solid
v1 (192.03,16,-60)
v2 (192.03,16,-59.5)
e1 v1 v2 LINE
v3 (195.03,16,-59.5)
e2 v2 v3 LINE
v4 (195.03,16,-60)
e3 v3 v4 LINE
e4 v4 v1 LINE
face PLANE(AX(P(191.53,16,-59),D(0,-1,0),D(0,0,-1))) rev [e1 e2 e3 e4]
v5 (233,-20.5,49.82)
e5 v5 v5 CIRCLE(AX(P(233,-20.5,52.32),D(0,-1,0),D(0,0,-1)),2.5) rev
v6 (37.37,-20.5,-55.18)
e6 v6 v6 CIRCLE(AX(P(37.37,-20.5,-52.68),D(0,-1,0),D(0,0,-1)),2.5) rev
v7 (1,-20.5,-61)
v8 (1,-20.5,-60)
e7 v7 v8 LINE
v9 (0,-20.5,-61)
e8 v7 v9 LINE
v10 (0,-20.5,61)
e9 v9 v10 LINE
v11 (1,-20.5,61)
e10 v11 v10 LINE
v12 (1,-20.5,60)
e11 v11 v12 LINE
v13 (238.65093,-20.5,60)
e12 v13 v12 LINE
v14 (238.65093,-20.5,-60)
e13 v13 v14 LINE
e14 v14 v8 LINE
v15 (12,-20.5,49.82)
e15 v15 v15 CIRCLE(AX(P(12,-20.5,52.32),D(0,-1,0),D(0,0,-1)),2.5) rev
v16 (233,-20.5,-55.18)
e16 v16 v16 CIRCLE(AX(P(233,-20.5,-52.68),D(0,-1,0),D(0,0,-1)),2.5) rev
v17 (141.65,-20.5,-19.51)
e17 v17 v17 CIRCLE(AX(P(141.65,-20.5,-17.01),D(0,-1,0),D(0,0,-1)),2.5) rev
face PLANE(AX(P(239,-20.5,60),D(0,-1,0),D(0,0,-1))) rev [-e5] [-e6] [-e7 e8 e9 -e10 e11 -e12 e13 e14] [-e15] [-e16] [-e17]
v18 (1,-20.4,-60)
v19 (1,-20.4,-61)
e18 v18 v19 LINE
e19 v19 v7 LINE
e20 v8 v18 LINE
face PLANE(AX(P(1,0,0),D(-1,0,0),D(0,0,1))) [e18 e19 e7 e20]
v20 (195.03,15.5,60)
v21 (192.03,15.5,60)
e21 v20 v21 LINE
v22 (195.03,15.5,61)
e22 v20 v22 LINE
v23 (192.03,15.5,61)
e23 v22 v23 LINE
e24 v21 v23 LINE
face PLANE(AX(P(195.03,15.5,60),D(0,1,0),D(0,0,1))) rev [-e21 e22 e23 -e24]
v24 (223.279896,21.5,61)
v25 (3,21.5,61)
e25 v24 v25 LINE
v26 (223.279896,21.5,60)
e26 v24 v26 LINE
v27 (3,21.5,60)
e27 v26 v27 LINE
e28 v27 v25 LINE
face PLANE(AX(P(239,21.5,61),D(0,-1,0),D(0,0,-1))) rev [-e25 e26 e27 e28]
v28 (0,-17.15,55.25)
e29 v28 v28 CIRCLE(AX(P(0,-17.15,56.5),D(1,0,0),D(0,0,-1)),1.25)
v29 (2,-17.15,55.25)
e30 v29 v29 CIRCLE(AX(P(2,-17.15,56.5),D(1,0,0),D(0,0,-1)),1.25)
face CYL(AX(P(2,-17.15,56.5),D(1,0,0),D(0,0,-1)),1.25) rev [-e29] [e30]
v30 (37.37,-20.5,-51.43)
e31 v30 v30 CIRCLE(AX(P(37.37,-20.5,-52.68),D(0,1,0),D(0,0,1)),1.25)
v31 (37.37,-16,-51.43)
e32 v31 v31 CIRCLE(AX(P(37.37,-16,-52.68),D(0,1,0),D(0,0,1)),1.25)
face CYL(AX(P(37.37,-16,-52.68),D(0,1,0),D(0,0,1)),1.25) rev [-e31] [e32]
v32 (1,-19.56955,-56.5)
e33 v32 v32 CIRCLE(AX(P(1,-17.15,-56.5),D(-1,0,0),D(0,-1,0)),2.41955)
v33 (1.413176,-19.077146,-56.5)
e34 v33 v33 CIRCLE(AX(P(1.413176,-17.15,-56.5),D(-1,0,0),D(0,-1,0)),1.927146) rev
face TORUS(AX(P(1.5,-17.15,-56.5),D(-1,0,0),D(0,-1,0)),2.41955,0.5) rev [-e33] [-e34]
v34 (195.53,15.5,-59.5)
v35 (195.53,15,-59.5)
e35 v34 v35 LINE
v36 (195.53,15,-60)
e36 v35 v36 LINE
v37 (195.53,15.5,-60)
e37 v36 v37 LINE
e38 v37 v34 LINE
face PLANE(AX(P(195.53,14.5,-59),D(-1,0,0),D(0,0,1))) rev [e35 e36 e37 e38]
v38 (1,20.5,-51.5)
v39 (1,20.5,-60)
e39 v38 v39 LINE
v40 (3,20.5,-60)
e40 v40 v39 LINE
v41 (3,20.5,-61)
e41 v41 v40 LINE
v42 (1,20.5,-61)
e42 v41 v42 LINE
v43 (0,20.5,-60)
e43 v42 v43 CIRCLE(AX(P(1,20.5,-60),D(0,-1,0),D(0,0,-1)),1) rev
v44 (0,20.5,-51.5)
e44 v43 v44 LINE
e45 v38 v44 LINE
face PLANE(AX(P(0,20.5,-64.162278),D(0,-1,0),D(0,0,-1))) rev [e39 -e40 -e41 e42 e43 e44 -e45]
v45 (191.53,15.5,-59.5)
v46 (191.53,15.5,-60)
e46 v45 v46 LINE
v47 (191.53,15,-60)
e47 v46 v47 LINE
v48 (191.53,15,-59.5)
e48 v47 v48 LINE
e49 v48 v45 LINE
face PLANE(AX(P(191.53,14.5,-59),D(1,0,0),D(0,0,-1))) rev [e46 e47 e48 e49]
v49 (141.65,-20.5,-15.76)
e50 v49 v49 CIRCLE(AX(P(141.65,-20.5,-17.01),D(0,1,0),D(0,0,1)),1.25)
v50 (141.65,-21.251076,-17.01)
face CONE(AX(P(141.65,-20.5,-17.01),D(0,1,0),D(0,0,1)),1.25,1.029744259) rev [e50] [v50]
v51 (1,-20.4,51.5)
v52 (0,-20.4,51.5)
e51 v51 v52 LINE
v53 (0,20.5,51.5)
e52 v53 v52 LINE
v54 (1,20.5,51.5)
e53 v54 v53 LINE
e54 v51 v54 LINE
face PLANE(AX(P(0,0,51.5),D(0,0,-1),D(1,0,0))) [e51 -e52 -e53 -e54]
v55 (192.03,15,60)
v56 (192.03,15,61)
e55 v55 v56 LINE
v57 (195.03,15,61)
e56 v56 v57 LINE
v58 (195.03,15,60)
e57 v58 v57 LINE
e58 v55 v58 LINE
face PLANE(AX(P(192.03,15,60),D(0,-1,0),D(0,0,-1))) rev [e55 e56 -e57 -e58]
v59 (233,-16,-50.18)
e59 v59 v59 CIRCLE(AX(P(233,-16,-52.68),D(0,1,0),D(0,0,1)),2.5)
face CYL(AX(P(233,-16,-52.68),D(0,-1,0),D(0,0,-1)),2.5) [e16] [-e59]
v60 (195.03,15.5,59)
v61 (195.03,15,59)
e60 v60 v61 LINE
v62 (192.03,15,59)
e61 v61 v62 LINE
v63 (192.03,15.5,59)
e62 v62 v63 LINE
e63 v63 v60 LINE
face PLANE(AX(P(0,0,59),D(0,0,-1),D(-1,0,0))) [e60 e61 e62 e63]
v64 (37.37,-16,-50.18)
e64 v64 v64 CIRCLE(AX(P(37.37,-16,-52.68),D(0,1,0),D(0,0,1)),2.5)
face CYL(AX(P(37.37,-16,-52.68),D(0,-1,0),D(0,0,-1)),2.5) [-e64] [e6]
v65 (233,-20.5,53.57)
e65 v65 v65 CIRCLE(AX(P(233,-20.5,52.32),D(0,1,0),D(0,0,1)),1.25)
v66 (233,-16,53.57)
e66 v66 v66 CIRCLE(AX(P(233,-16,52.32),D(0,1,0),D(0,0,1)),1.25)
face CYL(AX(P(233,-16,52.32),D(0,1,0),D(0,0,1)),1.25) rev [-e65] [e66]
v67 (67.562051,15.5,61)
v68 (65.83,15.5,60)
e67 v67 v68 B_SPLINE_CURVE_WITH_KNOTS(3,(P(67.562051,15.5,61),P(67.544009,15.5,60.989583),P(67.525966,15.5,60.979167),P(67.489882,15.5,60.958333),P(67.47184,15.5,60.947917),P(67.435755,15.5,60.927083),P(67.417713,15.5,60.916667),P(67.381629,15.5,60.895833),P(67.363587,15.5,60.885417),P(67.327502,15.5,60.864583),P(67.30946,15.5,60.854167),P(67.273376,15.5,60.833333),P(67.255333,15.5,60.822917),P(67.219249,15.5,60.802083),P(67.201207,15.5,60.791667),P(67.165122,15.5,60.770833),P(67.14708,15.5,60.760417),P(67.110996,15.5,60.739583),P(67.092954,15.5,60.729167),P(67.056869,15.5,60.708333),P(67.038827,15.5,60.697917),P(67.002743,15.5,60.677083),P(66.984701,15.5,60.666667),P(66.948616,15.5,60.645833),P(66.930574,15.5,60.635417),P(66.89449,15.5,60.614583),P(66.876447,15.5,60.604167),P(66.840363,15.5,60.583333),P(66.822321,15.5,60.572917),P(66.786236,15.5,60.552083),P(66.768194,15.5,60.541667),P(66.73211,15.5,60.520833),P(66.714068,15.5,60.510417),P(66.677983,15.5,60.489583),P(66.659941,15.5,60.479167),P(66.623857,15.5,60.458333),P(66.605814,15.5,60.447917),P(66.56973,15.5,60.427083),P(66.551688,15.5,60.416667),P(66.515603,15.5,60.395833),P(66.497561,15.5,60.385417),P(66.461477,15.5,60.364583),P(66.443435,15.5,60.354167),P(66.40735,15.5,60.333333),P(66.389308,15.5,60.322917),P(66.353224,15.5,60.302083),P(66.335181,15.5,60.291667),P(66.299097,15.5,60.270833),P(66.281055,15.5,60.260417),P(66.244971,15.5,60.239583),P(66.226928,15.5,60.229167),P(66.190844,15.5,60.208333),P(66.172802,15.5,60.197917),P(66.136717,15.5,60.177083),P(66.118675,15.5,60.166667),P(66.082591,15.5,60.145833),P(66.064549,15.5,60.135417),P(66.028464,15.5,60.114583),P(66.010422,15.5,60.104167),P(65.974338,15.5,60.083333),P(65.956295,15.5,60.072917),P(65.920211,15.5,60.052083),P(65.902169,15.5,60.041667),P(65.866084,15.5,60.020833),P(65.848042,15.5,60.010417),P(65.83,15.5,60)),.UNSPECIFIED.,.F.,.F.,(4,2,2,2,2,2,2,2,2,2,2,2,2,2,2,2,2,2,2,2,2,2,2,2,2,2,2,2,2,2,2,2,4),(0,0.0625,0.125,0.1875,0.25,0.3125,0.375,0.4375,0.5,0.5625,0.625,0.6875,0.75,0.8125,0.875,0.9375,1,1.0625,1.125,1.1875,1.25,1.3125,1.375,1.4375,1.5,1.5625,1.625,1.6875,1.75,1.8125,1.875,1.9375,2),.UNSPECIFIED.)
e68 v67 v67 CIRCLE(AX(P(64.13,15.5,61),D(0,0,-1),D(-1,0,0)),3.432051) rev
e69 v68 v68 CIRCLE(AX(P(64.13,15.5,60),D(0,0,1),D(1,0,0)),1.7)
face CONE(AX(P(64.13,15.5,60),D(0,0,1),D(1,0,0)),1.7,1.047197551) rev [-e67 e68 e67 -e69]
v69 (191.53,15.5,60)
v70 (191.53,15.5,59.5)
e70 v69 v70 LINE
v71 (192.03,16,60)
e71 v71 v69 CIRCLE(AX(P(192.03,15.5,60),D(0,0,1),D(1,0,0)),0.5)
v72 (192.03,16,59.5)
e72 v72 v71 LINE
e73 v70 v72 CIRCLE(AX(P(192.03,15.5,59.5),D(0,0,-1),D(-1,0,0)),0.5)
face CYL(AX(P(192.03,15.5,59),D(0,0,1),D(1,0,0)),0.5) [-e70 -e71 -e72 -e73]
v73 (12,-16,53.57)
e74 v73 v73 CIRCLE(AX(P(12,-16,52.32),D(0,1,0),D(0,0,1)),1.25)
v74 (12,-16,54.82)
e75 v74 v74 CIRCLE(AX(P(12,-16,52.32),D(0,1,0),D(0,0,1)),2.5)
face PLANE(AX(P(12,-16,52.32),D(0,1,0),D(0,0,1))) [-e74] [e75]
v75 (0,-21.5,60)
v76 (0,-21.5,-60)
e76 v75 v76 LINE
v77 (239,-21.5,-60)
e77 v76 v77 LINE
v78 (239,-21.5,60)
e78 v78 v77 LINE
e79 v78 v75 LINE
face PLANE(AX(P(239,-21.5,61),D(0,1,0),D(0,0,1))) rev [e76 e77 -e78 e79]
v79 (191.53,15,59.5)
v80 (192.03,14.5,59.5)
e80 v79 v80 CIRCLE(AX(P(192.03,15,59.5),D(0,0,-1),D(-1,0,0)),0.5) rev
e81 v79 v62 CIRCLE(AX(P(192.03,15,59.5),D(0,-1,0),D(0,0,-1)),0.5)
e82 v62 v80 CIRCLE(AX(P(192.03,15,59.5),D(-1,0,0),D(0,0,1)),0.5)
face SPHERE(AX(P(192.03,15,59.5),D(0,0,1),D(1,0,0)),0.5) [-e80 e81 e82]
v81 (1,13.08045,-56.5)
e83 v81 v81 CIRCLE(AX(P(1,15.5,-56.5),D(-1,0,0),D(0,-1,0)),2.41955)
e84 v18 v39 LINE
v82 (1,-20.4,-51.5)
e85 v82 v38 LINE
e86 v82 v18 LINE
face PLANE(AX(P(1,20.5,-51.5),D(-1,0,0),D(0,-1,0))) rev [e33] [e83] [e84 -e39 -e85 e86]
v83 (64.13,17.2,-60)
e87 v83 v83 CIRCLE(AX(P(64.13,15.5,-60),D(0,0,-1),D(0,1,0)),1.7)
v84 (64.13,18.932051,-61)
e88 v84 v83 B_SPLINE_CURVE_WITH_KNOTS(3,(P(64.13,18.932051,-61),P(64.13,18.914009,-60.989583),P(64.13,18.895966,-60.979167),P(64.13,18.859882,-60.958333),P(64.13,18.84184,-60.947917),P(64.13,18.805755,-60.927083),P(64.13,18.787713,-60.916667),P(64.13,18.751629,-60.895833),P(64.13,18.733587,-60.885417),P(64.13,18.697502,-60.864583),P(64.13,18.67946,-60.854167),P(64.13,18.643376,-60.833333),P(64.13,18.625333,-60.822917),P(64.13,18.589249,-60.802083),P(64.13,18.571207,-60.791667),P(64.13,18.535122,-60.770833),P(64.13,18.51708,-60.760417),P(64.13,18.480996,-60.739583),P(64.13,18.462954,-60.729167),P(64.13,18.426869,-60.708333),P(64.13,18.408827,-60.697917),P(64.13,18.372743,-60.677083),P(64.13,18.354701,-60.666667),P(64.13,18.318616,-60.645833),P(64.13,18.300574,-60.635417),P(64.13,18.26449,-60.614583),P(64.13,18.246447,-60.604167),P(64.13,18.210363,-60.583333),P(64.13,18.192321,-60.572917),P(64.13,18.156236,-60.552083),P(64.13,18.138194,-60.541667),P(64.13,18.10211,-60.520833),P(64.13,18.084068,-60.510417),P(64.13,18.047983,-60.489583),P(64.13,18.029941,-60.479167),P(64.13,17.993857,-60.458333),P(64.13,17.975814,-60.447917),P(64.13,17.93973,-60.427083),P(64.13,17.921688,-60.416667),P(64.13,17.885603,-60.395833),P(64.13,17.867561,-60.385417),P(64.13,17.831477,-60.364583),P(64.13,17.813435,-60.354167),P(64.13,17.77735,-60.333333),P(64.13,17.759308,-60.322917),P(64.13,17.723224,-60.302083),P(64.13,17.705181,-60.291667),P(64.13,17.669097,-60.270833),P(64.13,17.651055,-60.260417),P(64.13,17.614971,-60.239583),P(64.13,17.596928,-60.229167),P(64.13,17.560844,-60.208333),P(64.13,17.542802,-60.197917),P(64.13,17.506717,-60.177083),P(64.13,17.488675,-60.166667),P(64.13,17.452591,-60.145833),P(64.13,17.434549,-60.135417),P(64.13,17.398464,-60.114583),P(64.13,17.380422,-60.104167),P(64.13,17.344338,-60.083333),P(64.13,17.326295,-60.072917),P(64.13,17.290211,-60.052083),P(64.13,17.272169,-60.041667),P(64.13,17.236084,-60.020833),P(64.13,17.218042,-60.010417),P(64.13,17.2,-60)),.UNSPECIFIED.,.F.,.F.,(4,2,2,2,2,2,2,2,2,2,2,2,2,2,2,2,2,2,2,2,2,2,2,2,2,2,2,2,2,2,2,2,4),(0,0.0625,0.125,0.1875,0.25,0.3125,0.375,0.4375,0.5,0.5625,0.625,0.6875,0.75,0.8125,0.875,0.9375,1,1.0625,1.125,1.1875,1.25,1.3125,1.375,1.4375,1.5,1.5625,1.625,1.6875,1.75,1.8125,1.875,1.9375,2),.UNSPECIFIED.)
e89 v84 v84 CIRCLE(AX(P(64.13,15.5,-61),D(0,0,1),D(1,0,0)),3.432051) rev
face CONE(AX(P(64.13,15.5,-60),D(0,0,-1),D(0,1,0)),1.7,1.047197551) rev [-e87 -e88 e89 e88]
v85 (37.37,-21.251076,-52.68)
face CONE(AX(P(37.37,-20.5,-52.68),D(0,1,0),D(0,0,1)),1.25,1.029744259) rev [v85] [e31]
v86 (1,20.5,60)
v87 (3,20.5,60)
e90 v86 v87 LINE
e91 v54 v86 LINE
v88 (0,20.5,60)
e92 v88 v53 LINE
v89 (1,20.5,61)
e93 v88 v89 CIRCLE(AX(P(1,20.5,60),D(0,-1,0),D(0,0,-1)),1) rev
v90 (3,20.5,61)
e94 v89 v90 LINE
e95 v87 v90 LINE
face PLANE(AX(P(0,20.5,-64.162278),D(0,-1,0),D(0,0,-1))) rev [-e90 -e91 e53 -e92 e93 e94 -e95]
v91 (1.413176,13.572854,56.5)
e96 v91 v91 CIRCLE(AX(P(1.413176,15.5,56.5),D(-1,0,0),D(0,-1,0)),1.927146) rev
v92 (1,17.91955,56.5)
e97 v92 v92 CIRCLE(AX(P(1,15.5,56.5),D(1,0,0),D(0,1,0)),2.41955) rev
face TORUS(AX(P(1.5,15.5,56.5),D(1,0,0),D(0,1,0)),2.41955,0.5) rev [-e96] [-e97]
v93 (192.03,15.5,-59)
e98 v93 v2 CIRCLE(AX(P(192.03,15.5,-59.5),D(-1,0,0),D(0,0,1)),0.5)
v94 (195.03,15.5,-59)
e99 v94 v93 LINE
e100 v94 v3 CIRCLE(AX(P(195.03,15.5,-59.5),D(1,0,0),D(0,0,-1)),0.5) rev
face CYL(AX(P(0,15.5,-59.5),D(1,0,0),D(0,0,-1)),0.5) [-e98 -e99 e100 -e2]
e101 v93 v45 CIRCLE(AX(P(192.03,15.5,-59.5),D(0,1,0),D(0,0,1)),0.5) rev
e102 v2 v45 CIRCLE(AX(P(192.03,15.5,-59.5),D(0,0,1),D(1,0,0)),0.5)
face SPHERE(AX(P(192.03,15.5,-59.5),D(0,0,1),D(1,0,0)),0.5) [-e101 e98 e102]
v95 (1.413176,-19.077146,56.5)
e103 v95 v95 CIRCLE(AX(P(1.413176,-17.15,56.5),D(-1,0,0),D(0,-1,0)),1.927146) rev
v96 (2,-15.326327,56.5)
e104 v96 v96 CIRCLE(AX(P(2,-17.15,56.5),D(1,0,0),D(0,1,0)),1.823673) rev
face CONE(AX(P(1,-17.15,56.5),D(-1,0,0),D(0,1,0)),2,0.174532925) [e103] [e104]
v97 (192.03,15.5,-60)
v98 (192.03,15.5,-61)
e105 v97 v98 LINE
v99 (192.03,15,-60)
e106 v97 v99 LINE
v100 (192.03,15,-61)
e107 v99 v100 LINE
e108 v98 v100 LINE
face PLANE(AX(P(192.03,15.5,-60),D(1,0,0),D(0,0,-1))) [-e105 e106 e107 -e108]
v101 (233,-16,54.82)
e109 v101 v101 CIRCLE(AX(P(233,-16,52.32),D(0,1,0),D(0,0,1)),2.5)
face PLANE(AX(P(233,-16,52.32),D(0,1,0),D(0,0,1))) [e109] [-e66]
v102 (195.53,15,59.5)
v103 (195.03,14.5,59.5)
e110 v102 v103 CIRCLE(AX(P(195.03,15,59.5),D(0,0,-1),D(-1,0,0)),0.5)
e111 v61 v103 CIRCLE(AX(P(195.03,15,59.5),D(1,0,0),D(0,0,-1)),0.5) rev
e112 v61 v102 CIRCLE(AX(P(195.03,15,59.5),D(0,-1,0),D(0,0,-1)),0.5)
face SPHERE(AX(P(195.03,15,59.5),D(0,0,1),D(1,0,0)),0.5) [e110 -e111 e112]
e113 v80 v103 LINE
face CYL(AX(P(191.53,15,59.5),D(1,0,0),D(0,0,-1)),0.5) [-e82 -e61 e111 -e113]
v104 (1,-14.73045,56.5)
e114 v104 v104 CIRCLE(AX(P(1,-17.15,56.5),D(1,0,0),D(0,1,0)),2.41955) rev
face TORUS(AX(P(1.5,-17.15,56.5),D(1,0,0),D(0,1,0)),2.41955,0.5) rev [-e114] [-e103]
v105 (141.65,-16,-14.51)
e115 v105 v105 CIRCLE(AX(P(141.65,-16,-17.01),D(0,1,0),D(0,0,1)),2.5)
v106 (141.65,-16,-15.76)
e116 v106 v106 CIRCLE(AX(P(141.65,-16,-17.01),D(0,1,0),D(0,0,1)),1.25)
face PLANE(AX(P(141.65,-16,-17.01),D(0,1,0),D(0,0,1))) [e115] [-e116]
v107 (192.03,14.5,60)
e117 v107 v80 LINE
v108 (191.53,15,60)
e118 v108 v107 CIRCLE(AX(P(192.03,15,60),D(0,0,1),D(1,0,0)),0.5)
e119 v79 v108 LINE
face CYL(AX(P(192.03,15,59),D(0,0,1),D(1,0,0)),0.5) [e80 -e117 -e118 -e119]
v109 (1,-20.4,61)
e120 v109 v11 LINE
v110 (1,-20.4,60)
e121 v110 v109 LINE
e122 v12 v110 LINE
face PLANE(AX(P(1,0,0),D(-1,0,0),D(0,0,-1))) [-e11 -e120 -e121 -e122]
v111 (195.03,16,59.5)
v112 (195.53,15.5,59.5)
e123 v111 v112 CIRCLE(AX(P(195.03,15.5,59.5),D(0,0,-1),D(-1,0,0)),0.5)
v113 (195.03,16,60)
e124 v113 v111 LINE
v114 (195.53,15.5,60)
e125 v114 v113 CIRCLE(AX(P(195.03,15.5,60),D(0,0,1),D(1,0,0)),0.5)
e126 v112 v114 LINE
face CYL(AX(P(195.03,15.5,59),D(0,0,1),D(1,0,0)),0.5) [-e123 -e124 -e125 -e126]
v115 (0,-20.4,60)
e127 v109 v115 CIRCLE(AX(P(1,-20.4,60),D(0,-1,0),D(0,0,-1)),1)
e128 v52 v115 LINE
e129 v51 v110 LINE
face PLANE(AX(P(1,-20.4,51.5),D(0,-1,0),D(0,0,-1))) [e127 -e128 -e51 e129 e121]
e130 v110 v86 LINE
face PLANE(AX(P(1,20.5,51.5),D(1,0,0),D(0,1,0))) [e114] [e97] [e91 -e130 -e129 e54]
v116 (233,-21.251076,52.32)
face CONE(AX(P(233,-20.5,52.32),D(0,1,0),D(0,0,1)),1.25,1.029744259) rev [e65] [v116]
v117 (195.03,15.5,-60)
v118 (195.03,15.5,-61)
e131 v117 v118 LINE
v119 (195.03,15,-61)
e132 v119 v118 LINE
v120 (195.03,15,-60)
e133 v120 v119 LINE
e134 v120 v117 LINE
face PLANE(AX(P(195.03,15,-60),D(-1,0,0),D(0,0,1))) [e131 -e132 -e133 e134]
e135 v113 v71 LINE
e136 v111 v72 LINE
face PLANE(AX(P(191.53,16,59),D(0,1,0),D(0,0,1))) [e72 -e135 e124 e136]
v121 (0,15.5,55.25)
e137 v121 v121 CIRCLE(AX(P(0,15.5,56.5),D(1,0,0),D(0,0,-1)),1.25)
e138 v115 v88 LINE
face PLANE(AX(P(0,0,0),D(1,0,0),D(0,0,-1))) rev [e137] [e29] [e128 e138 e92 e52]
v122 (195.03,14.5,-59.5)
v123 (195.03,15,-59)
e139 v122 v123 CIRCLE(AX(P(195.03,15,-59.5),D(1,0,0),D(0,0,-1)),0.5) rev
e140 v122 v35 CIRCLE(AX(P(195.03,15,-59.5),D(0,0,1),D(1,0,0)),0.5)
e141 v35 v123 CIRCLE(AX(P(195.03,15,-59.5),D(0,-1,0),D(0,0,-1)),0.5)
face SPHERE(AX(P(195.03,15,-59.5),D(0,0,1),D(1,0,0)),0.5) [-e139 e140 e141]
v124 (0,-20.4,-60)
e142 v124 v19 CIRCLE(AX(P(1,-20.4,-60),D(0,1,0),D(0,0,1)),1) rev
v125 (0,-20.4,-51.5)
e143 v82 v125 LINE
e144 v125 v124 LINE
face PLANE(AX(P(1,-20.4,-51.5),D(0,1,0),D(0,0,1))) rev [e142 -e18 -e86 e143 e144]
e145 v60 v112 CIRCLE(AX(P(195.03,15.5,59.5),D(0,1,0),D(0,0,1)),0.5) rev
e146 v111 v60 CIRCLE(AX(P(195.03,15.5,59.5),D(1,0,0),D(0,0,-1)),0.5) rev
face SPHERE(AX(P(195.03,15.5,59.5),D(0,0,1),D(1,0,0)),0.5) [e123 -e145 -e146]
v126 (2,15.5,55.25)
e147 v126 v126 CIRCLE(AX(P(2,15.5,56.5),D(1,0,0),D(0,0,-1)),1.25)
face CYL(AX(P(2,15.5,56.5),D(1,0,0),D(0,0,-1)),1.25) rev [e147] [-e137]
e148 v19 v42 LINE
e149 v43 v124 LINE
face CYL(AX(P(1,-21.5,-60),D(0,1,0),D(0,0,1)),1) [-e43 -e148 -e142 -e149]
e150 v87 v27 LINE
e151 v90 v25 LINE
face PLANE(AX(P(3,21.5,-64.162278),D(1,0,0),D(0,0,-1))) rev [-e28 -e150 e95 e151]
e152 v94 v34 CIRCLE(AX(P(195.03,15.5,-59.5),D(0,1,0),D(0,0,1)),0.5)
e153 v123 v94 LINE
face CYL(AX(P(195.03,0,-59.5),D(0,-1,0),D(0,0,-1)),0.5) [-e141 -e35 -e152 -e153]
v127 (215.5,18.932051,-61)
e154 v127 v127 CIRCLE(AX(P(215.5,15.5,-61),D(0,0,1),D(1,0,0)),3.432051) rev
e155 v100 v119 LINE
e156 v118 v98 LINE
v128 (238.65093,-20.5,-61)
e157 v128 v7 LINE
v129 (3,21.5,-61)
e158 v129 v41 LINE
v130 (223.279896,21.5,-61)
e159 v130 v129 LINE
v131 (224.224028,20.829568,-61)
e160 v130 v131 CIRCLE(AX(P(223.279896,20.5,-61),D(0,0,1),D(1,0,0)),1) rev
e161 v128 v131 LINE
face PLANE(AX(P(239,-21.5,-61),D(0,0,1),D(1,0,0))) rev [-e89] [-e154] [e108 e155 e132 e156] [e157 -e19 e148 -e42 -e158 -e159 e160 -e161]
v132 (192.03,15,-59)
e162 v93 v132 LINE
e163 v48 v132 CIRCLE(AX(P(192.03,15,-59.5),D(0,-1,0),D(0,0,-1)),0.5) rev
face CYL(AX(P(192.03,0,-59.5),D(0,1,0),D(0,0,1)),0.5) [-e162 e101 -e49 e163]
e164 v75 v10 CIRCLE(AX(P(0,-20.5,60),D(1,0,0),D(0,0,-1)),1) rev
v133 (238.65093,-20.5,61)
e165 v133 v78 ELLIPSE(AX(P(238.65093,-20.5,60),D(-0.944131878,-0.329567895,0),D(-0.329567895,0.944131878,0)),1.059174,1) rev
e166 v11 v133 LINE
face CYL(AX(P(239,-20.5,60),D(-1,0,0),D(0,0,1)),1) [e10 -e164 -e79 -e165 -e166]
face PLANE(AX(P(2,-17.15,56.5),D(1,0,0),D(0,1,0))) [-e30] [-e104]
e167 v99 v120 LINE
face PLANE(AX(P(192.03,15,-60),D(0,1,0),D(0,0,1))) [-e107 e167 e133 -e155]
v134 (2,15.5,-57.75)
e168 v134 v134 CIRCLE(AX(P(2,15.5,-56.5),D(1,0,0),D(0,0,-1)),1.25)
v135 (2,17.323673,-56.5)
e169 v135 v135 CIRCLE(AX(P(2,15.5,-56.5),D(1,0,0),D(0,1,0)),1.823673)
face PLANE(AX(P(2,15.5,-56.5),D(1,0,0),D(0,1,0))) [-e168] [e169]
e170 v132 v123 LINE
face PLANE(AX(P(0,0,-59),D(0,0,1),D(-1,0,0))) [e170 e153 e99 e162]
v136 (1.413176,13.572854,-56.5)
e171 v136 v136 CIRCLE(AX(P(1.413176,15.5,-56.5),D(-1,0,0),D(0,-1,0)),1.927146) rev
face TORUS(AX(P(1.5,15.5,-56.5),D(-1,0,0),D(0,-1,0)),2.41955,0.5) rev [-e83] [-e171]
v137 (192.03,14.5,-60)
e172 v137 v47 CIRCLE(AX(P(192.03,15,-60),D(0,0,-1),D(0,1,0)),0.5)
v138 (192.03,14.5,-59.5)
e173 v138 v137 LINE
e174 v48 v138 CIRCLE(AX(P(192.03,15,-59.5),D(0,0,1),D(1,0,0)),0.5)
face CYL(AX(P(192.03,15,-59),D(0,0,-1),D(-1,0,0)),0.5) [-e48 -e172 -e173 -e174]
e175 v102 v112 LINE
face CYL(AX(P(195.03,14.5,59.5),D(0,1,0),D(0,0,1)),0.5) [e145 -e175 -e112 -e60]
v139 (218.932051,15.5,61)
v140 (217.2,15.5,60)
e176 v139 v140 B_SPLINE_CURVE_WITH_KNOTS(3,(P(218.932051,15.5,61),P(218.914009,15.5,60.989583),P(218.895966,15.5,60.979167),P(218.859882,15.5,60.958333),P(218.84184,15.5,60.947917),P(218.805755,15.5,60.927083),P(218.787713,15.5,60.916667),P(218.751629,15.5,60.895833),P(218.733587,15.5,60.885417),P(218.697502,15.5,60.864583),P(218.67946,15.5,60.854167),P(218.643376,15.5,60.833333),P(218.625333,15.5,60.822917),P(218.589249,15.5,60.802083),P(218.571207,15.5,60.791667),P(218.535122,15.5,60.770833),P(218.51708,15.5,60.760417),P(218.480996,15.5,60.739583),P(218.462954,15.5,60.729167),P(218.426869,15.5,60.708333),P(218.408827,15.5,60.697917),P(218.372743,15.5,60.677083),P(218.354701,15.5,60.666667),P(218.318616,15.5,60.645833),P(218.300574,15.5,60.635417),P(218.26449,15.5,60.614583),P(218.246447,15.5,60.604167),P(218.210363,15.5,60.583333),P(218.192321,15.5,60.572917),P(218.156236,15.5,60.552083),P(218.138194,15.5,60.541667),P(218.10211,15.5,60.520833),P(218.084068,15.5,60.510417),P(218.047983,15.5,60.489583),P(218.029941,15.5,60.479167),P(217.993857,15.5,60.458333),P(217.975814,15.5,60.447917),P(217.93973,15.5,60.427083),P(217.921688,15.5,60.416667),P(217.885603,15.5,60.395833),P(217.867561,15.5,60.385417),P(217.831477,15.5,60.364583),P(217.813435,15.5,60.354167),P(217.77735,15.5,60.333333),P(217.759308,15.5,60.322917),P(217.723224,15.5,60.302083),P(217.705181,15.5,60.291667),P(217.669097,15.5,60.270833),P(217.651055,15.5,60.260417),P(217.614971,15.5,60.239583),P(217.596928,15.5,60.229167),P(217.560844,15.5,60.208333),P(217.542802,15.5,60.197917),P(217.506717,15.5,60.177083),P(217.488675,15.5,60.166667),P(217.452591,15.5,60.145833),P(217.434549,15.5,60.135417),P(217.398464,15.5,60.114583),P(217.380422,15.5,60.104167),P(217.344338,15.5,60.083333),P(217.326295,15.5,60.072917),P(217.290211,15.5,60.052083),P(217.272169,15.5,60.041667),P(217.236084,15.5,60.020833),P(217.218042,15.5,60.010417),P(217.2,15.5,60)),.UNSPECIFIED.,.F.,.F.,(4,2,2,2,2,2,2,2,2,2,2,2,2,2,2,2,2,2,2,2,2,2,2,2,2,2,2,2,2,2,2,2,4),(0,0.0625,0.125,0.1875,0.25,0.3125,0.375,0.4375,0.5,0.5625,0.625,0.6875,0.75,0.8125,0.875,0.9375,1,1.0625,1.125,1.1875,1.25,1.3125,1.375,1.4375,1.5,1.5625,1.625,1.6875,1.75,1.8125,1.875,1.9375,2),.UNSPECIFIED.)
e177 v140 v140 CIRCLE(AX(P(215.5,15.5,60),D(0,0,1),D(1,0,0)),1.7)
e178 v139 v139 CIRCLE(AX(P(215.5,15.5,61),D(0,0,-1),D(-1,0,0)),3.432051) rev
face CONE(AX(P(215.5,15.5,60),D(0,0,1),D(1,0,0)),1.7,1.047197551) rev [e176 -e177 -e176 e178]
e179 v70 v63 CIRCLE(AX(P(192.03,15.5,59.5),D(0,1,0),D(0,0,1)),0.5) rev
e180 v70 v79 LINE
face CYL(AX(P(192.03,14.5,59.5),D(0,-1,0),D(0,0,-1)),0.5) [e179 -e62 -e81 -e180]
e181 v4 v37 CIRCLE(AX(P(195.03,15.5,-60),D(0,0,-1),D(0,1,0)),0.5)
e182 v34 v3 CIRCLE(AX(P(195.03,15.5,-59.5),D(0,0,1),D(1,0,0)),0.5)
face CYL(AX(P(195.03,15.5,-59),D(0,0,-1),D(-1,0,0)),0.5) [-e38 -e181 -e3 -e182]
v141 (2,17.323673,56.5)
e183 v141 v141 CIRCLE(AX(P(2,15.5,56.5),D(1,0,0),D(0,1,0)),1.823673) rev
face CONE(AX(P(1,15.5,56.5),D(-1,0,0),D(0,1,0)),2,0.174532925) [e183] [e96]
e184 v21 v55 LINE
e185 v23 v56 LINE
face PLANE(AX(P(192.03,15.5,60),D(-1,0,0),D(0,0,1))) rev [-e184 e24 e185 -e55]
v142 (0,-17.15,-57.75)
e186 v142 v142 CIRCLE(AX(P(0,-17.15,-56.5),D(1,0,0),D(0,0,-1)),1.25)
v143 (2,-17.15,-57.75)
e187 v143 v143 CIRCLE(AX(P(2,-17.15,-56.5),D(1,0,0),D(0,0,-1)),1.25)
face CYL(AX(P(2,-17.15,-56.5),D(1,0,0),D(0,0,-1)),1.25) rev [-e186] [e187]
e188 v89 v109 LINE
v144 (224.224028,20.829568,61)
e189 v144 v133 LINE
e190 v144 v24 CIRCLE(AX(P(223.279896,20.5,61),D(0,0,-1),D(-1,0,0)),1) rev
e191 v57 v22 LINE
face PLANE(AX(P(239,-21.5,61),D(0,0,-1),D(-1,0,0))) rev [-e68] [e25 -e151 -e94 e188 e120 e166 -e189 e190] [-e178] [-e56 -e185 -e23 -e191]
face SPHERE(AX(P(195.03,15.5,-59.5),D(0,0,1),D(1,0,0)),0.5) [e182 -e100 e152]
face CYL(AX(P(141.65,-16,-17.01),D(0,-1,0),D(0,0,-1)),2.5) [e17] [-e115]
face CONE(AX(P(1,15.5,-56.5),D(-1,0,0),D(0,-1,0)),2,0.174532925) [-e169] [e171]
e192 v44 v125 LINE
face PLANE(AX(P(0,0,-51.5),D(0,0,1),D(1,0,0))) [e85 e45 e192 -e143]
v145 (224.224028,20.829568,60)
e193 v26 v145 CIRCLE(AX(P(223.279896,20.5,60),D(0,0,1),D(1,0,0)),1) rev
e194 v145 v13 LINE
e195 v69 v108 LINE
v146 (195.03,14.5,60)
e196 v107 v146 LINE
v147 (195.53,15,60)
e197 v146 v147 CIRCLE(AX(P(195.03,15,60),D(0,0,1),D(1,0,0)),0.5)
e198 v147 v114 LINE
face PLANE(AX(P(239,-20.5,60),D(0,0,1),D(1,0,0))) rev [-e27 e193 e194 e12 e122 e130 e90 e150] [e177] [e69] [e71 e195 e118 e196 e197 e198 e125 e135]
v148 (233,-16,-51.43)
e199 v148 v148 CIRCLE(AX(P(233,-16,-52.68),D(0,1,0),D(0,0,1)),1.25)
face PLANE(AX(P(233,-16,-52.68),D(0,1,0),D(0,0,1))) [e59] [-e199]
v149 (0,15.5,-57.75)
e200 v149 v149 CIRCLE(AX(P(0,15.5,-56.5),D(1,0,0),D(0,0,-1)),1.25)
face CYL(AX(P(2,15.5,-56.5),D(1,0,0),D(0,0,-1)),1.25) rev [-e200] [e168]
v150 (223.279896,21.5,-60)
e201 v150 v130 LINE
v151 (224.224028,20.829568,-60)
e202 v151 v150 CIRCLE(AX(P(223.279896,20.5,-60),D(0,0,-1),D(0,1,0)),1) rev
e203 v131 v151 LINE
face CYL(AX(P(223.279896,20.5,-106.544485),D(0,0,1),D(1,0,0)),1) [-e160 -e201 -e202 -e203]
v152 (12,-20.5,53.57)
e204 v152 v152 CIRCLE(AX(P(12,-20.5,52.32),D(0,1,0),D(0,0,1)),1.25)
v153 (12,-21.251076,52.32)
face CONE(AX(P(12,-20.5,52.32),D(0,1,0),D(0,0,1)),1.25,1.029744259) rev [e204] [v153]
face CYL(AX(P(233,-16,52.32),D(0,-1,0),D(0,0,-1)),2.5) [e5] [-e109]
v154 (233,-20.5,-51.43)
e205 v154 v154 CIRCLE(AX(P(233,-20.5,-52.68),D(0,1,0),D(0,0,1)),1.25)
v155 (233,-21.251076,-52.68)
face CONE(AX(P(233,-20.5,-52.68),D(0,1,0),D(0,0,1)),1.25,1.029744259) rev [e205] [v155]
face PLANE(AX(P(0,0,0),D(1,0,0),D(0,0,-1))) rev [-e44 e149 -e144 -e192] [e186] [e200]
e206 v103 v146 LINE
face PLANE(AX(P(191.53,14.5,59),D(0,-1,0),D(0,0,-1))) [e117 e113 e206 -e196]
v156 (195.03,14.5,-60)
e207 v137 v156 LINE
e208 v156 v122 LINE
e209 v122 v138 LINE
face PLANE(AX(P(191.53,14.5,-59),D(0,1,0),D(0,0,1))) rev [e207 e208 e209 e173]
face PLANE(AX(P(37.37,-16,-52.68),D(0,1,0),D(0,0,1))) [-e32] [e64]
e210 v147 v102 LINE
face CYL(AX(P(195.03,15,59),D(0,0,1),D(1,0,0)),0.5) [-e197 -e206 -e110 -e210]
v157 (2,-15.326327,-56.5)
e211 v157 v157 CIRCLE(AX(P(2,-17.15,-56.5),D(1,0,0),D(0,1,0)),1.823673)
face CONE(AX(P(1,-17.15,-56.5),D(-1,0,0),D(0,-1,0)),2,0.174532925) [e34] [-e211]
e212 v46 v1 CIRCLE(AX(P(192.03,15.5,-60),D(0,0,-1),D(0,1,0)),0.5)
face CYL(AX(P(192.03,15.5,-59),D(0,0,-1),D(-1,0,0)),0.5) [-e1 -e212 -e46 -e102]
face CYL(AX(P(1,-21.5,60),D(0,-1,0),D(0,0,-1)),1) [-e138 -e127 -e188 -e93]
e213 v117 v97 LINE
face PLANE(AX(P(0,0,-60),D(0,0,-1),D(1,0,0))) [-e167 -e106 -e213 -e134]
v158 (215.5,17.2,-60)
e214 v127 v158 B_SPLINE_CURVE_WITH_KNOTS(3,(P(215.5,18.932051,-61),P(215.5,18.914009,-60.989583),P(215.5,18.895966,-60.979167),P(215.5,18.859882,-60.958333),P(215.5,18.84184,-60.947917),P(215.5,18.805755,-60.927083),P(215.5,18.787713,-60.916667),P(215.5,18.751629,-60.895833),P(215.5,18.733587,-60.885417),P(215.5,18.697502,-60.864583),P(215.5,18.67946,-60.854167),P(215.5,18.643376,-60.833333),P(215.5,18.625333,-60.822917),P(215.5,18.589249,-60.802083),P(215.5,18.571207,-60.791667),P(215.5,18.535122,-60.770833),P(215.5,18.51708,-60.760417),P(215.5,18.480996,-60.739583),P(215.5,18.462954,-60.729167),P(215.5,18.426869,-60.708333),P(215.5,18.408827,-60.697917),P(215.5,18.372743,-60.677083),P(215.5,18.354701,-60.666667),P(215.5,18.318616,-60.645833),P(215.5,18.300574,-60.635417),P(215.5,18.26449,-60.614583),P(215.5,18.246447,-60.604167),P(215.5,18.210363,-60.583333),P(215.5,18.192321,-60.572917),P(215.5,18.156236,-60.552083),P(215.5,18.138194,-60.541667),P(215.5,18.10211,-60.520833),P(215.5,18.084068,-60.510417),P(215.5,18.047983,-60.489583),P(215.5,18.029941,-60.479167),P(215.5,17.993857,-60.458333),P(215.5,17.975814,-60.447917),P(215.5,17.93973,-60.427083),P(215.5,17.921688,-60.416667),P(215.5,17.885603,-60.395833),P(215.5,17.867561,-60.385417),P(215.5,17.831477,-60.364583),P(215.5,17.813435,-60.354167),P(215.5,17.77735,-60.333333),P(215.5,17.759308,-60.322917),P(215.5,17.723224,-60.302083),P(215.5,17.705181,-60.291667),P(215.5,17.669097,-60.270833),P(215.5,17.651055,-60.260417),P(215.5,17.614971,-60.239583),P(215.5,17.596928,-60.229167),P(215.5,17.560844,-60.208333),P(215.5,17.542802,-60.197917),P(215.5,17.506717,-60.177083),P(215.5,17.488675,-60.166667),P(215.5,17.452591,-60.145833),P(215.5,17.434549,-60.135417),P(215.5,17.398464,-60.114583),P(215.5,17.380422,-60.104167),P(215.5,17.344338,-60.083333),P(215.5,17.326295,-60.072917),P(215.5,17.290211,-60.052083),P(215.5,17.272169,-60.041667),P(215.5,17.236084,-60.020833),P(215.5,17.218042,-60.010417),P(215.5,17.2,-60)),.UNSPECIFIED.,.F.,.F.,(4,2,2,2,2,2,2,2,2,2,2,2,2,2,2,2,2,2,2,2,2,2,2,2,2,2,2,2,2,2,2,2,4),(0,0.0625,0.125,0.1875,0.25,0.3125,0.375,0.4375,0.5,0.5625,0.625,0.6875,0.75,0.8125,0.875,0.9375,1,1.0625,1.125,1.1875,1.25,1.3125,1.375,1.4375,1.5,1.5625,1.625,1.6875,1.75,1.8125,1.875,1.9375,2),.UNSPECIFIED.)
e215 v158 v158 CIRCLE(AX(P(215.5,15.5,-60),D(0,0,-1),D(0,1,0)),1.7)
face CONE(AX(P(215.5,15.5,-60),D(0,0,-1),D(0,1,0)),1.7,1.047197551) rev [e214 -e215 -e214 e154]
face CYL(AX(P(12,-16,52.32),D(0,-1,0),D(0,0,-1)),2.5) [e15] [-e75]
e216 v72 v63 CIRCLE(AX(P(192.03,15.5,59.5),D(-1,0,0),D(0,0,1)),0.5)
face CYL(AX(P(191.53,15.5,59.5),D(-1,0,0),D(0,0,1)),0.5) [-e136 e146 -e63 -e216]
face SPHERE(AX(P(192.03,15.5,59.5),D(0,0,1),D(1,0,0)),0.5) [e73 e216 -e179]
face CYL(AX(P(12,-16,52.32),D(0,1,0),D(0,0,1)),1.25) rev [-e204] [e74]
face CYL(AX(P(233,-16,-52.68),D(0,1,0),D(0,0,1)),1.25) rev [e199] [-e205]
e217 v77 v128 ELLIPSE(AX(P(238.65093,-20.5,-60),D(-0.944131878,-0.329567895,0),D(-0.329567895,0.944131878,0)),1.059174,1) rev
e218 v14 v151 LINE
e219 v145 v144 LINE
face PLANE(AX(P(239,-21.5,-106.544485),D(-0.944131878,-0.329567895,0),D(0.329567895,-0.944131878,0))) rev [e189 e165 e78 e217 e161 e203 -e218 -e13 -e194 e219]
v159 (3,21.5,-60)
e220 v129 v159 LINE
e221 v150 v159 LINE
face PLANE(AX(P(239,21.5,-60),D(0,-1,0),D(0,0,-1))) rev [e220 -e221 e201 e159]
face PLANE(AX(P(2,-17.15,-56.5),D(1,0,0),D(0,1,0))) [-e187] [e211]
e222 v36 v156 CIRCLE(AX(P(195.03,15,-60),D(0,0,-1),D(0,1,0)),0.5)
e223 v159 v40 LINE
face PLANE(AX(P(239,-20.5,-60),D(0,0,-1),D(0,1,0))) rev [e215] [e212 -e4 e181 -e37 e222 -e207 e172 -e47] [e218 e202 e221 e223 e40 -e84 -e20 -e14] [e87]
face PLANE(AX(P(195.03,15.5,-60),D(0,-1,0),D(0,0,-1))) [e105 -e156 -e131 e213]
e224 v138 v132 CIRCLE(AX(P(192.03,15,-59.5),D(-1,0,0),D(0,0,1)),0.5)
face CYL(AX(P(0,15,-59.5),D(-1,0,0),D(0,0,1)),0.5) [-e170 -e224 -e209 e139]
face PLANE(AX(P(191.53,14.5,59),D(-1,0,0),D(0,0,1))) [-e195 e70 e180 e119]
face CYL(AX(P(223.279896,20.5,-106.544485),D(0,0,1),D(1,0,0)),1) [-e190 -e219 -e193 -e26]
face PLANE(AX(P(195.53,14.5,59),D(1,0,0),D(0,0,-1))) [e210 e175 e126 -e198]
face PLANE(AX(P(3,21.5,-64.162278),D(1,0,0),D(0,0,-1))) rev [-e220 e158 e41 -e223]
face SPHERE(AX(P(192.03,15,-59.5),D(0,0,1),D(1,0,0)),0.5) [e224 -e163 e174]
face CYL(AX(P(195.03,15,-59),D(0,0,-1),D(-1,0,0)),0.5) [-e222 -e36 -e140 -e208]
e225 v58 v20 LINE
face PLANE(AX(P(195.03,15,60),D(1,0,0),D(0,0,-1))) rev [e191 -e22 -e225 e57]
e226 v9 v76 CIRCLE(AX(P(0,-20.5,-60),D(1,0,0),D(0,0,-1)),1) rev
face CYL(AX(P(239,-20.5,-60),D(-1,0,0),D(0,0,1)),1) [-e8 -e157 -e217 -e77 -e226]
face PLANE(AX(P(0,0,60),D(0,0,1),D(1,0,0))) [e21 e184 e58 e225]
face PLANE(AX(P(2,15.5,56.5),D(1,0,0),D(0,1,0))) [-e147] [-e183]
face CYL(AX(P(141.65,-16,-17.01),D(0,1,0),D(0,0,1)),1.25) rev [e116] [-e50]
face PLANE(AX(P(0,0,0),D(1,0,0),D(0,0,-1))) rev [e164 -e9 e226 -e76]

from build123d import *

# Parameters (mm, degrees)
BOSS_EXTRUDE1_DEPTH                 = 239
CUT_EXTRUDE1_REACH                  = 271.197
CUT_EXTRUDE2_REACH                  = 271.197
SKETCH3_W                           = 3
SKETCH3_H                           = 1
F_3_4_3_4_DIAMETER_HOLE1_AT_2_COUNT = 2
F_3_4_3_4_DIAMETER_HOLE1_AT_2_PITCH = 151.37
DRAFT5_ANGLE                        = -60
DRAFT7_ANGLE                        = -60
SKETCH6_W                           = 4
SKETCH6_H                           = 1.5
BOSS_EXTRUDE2_DEPTH                 = 2
SKETCH7_W                           = 3
SKETCH7_H                           = 0.5
CUT_EXTRUDE3_DEPTH                  = 1
FILLET1_R                           = 0.5
DRAFT8_ANGLE                        = -60
DRAFT9_ANGLE                        = -60
FILLET3_R                           = 0.5
SKETCH8_W                           = 1
SKETCH8_H                           = 41
BOSS_EXTRUDE3_DEPTH                 = 8.5
SKETCH9_W                           = 9.5
SKETCH9_H                           = 0.1
CUT_EXTRUDE4_DEPTH                  = 1
SKETCH10_R                          = 2
BOSS_EXTRUDE4_DEPTH                 = 1
M3X0_5_TAPPED_HOLE1_AT_2_COUNT      = 2
M3X0_5_TAPPED_HOLE1_AT_2_PITCH      = 32.65
DRAFT11_ANGLE                       = 10
FILLET5_R                           = 0.5
DRAFT12_ANGLE                       = 10
FILLET6_R                           = 0.5
DRAFT11_OF_MIRROR4_2_ANGLE          = 10
FILLET5_OF_MIRROR4_R                = 0.5
DRAFT12_OF_MIRROR4_2_ANGLE          = 10
FILLET6_OF_MIRROR4_R                = 0.5
FILLET7_R                           = 1
FILLET9_R                           = 1
SKETCH13_R                          = 2.5
BOSS_EXTRUDE5_DEPTH                 = 4.5
M3X0_5_TAPPED_HOLE2_D               = 2.5
M3X0_5_TAPPED_HOLE2_DEPTH           = 4.5
M3X0_5_TAPPED_HOLE2_TIP             = 0.751075774
FILLET10_R                          = 1


# Some blends are built 0.0001 mm under size
with BuildPart() as part:
    # Sketch1 → Boss-Extrude1 (new body)
    with BuildSketch(Plane(origin=(0, 0, 0), x_dir=(0, 0, -1), z_dir=(1, 0, 0))):
        Polygon((-60, -20.5), (-60, 21.5), (-61, 21.5), (-61, -21.5), (61, -21.5), (61, 21.5), (60, 21.5), (60, -20.5), align=None)
    extrude(amount=BOSS_EXTRUDE1_DEPTH)

    # Cut-Extrude1: up to this face of the body (flat: up to its plane)
    cut_extrude1_end = Plane(part.part.faces().sort_by_distance((119.5, 0, -61))[0])
    # Sketch2 → Cut-Extrude1 (cut, up to the picked face)
    with BuildSketch(Plane.XY.offset(61), mode=Mode.PRIVATE) as cut_extrude1_sk1:
        Polygon((239, -21.5), (223.99, 21.5), (239, 21.5), align=None)
    cut_extrude1_tool1 = split(extrude(cut_extrude1_sk1.sketch, amount=-CUT_EXTRUDE1_REACH, mode=Mode.PRIVATE), bisect_by=cut_extrude1_end, keep=Keep.BOTH, mode=Mode.PRIVATE)
    add(cut_extrude1_tool1.solids().sort_by(Axis((233.996667, 7.166667, 61), (0, 0, -1)))[0], mode=Mode.SUBTRACT)

    # Cut-Extrude2: up to this face of the body (flat: up to its plane)
    cut_extrude2_end = Plane(part.part.faces().sort_by_distance((115.78805165, -0.232341231, -61))[0])
    # Sketch3 → Cut-Extrude2 (cut, up to the picked face)
    with BuildSketch(Plane.XY.offset(61), mode=Mode.PRIVATE) as cut_extrude2_sk1:
        with Locations((1.5, 21)):
            Rectangle(SKETCH3_W, SKETCH3_H)
    cut_extrude2_tool1 = split(extrude(cut_extrude2_sk1.sketch, amount=-CUT_EXTRUDE2_REACH, mode=Mode.PRIVATE), bisect_by=cut_extrude2_end, keep=Keep.BOTH, mode=Mode.PRIVATE)
    add(cut_extrude2_tool1.solids().sort_by(Axis((1.5, 21, 61), (0, 0, -1)))[0], mode=Mode.SUBTRACT)

    # Sketch4 → Ø3.4 (3.4) Diameter Hole1 (revolve, cut)
    with BuildSketch(Plane(origin=(64.13, 15.5, 61), x_dir=(0, -1, 0), z_dir=(1, 0, 0))):
        Polygon((0, 0), (0, 2.821463052), (1.7, 1.8), (1.7, 0), align=None)
    f_3_4_3_4_diameter_hole1 = revolve(axis=Axis((64.13, 15.5, 67.35), (0, 0, -1)), mode=Mode.SUBTRACT)

    # Ø3.4 (3.4) Diameter Hole1 at 2: Ø3.4 (3.4) Diameter Hole1 ×2
    with Locations(*[(i * F_3_4_3_4_DIAMETER_HOLE1_AT_2_PITCH, 0, 0) for i in range(1, F_3_4_3_4_DIAMETER_HOLE1_AT_2_COUNT)]):
        add(f_3_4_3_4_diameter_hole1, mode=Mode.SUBTRACT)

    # Draft5
    draft5_faces = [part.faces().sort_by_distance(p)[0] for p in [
        (64.13, 17.2, 60.5),
    ]]
    draft(draft5_faces, Plane(origin=(239, -20.5, 60), x_dir=(-1, 0, 0), z_dir=(0, 0, -1)), DRAFT5_ANGLE)

    # Draft7
    draft7_faces = [part.faces().sort_by_distance(p)[0] for p in [
        (215.5, 17.2, 60.5),
    ]]
    draft(draft7_faces, Plane(origin=(239, -20.5, 60), x_dir=(-1, 0, 0), z_dir=(0, 0, -1)), DRAFT7_ANGLE)

    # Sketch6 → Boss-Extrude2 (add)
    with BuildSketch(Plane.XY.offset(61)):
        with Locations((193.53, 15.25)):
            Rectangle(SKETCH6_W, SKETCH6_H)
    boss_extrude2 = extrude(amount=-BOSS_EXTRUDE2_DEPTH)

    # Sketch7 → Cut-Extrude3 (cut)
    with BuildSketch(Plane.XY.offset(61)):
        with Locations((193.53, 15.25)):
            Rectangle(SKETCH7_W, SKETCH7_H)
    cut_extrude3 = extrude(amount=-CUT_EXTRUDE3_DEPTH, mode=Mode.SUBTRACT)

    # Fillet1
    fillet1_edges = [part.edges().sort_by_distance(p)[0] for p in [
        (195.53, 15.25, 59),
        (195.53, 16, 59.5),
        (193.53, 14.5, 59),
        (195.53, 14.5, 59.5),
        (191.53, 15.25, 59),
        (191.53, 14.5, 59.5),
        (193.53, 16, 59),
        (191.53, 16, 59.5),
    ]]
    fillet(fillet1_edges, radius=FILLET1_R)

    # Mirror1: Ø3.4 (3.4) Diameter Hole1, Boss-Extrude2, Cut-Extrude3 across plane
    add(f_3_4_3_4_diameter_hole1.mirror(Plane.XY), mode=Mode.SUBTRACT)
    add(boss_extrude2.mirror(Plane.XY))
    add(cut_extrude3.mirror(Plane.XY), mode=Mode.SUBTRACT)

    # Mirror1 copy 1 sketch → Mirror1 copy 1 (revolve, cut)
    with BuildSketch(Plane(origin=(215.5, 15.5, -61), x_dir=(0, -1, 0), z_dir=(1, 0, 0))):
        Polygon((0, 0), (0, -2.821463052), (1.7, -1.8), (1.7, 0), align=None)
    revolve(axis=Axis((215.5, 15.5, -67.35), (0, 0, -1)), mode=Mode.SUBTRACT)

    # Draft8
    draft8_faces = [part.faces().sort_by_distance(p)[0] for p in [
        (215.5, 17.2, -60.5),
    ]]
    draft(draft8_faces, Plane(origin=(239, -20.5, -60), x_dir=(0, 1, 0), z_dir=(0, 0, 1)), DRAFT8_ANGLE)

    # Draft9
    draft9_faces = [part.faces().sort_by_distance(p)[0] for p in [
        (64.13, 17.2, -60.5),
    ]]
    draft(draft9_faces, Plane(origin=(239, -20.5, -60), x_dir=(0, 1, 0), z_dir=(0, 0, 1)), DRAFT9_ANGLE)

    # Fillet3
    fillet3_edges = [part.edges().sort_by_distance(p)[0] for p in [
        (195.53, 14.5, -59.5),
        (195.53, 16, -59.5),
        (191.53, 16, -59.5),
        (191.53, 14.5, -59.5),
        (195.53, 15.25, -59),
        (193.53, 16, -59),
        (191.53, 15.25, -59),
        (193.53, 14.5, -59),
    ]]
    fillet(fillet3_edges, radius=FILLET3_R)

    # Sketch8 → Boss-Extrude3 (add)
    with BuildSketch(Plane.XY.offset(-60)):
        with Locations((0.5, 0)):
            Rectangle(SKETCH8_W, SKETCH8_H)
    boss_extrude3 = extrude(amount=BOSS_EXTRUDE3_DEPTH)

    # Sketch9 → Cut-Extrude4 (cut)
    with BuildSketch(Plane.ZY):
        with Locations((-56.25, -20.45)):
            Rectangle(SKETCH9_W, SKETCH9_H)
    cut_extrude4 = extrude(amount=-CUT_EXTRUDE4_DEPTH, mode=Mode.SUBTRACT)

    # Sketch10 → Boss-Extrude4 (add)
    with BuildSketch(Plane(origin=(1, 0, 0), x_dir=(0, 0, -1), z_dir=(1, 0, 0))):
        with Locations(Location((56.5, 15.5, 0), (0, 0, 270))):
            Circle(SKETCH10_R)
        with Locations(Location((56.5, -17.15, 0), (0, 0, 270))):
            Circle(SKETCH10_R)
    boss_extrude4 = extrude(amount=BOSS_EXTRUDE4_DEPTH)

    # Sketch11 → M3x0.5 Tapped Hole1 (revolve, cut)
    with BuildSketch(Plane(origin=(2, 15.5, -56.5), x_dir=(0, 0, -1), z_dir=(0, 1, 0))):
        Polygon((0, 0), (0, 2.751075774), (1.25, 2), (1.25, 0), align=None)
    m3x0_5_tapped_hole1 = revolve(axis=Axis((8.35, 15.5, -56.5), (-1, 0, 0)), mode=Mode.SUBTRACT)

    # M3x0.5 Tapped Hole1 at 2: M3x0.5 Tapped Hole1 ×2
    with Locations(*[(0, -i * M3X0_5_TAPPED_HOLE1_AT_2_PITCH, 0) for i in range(1, M3X0_5_TAPPED_HOLE1_AT_2_COUNT)]):
        add(m3x0_5_tapped_hole1, mode=Mode.SUBTRACT)

    # Draft11
    draft11_faces = [part.faces().sort_by_distance(p)[0] for p in [
        (1.5, 17.5, -56.5),
    ]]
    draft(draft11_faces, Plane(origin=(1, 20.5, -51.5), x_dir=(0, 1, 0), z_dir=(1, 0, 0)), DRAFT11_ANGLE)

    # Fillet5
    fillet5_edges = [part.edges().sort_by_distance(p)[0] for p in [
        (1, 17.5, -56.5),
    ]]
    fillet(fillet5_edges, radius=FILLET5_R)

    # Draft12
    draft12_faces = [part.faces().sort_by_distance(p)[0] for p in [
        (1.5, -15.15, -56.5),
    ]]
    draft(draft12_faces, Plane(origin=(1, 20.5, -51.5), x_dir=(0, 1, 0), z_dir=(1, 0, 0)), DRAFT12_ANGLE)

    # Fillet6
    fillet6_edges = [part.edges().sort_by_distance(p)[0] for p in [
        (1, -15.15, -56.5),
    ]]
    fillet(fillet6_edges, radius=FILLET6_R)

    # Mirror4: Boss-Extrude3, Cut-Extrude4, Boss-Extrude4, M3x0.5 Tapped Hole1 across plane
    add(boss_extrude3.mirror(Plane.XY))
    add(cut_extrude4.mirror(Plane.XY), mode=Mode.SUBTRACT)
    add(boss_extrude4.mirror(Plane.XY))
    add(m3x0_5_tapped_hole1.mirror(Plane.XY), mode=Mode.SUBTRACT)

    # Mirror4 copy 1 sketch → Mirror4 copy 1 (revolve, cut)
    with BuildSketch(Plane(origin=(2, -17.15, 56.5), x_dir=(0, 0, 1), z_dir=(0, 1, 0))):
        Polygon((0, 0), (0, -2.751075774), (1.25, -2), (1.25, 0), align=None)
    revolve(axis=Axis((8.35, -17.15, 56.5), (1, 0, 0)), mode=Mode.SUBTRACT)

    # Draft11 of Mirror4 2
    draft11_of_mirror4_2_faces = [part.faces().sort_by_distance(p)[0] for p in [
        (1.5, 17.5, 56.5),
    ]]
    draft(draft11_of_mirror4_2_faces, Plane(origin=(1, 20.5, 51.5), x_dir=(0, 1, 0), z_dir=(1, 0, 0)), DRAFT11_OF_MIRROR4_2_ANGLE)

    # Fillet5 of Mirror4
    fillet5_of_mirror4_edges = [part.edges().sort_by_distance(p)[0] for p in [
        (1, 17.5, 56.5),
    ]]
    fillet(fillet5_of_mirror4_edges, radius=FILLET5_OF_MIRROR4_R)

    # Draft12 of Mirror4 2
    draft12_of_mirror4_2_faces = [part.faces().sort_by_distance(p)[0] for p in [
        (1.5, -15.15, 56.5),
    ]]
    draft(draft12_of_mirror4_2_faces, Plane(origin=(1, 20.5, 51.5), x_dir=(0, 1, 0), z_dir=(1, 0, 0)), DRAFT12_OF_MIRROR4_2_ANGLE)

    # Fillet6 of Mirror4
    fillet6_of_mirror4_edges = [part.edges().sort_by_distance(p)[0] for p in [
        (1, -15.15, 56.5),
    ]]
    fillet(fillet6_of_mirror4_edges, radius=FILLET6_OF_MIRROR4_R)

    # Fillet7
    # the kernel refuses this fillet: 1 mm, written as the material it takes off along each edge
    with BuildSketch(Plane(origin=(-2.5, -21.5, -61), x_dir=(0, 1, 0), z_dir=(1, 0, 0))) as fillet7_piece_1:
        with BuildLine():
            CenterArc((FILLET7_R, FILLET7_R), FILLET7_R, 180, 90)
            Line((0, FILLET7_R), (0, 0))
            Line((0, 0), (FILLET7_R, 0))
        make_face()
    extrude(amount=244, mode=Mode.SUBTRACT)
    with BuildSketch(Plane(origin=(0, -20.4, -61), x_dir=(1, 0, 0), z_dir=(0, 1, 0))) as fillet7_piece_2:
        with BuildLine():
            CenterArc((FILLET7_R, -FILLET7_R), FILLET7_R, 90, 90)
            Line((0, -FILLET7_R), (0, 0))
            Line((0, 0), (FILLET7_R, 0))
        make_face()
    extrude(amount=43.4, mode=Mode.SUBTRACT)
    with BuildSketch(Plane(origin=(0, -24, -61), x_dir=(1, 0, 0), z_dir=(0, 1, 0))) as fillet7_piece_3_section:
        with BuildLine():
            CenterArc((FILLET7_R, -FILLET7_R), FILLET7_R, 90, 90)
            Line((0, -FILLET7_R), (0, 0))
            Line((0, 0), (FILLET7_R, 0))
        make_face()
    fillet7_piece_3 = extrude(amount=6, mode=Mode.PRIVATE)
    fillet7_piece_3 = split(fillet7_piece_3, bisect_by=Plane(origin=(0.223367939, -20.4, -60.776632061), z_dir=(0, 1, 0)), keep=Keep.TOP, mode=Mode.PRIVATE)
    add(fillet7_piece_3, mode=Mode.SUBTRACT)

    # Fillet9
    fillet9_edges = [part.edges().sort_by_distance(p)[0] for p in [
        (119.5, -21.5, 61),
        (0, 0.05, 61),
    ]]
    fillet(fillet9_edges, radius=FILLET9_R - 0.0001)  # a hair under: the kernel refuses the full size

    # Sketch13 → Boss-Extrude5 (add)
    with BuildSketch(Plane(origin=(0, -20.5, 0), x_dir=(1, 0, 0), z_dir=(0, 1, 0))):
        with Locations(Location((37.37, 52.68, 0), (0, 0, 90))):
            Circle(SKETCH13_R)
        with Locations(Location((233, 52.68, 0), (0, 0, 90))):
            Circle(SKETCH13_R)
        with Locations(Location((233, -52.32, 0), (0, 0, 90))):
            Circle(SKETCH13_R)
        with Locations(Location((12, -52.32, 0), (0, 0, 90))):
            Circle(SKETCH13_R)
        with Locations(Location((141.65, 17.01, 0), (0, 0, 90))):
            Circle(SKETCH13_R)
    extrude(amount=BOSS_EXTRUDE5_DEPTH)

    # M3x0.5 Tapped Hole2
    with Locations(Plane(origin=(0, -16, 0), x_dir=(1, 0, 0), z_dir=(0, 1, 0))):
        with Locations((37.37, 52.68), (233, 52.68), (141.65, 17.01), (12, -52.32), (233, -52.32)):
            Hole(M3X0_5_TAPPED_HOLE2_D / 2, depth=M3X0_5_TAPPED_HOLE2_DEPTH)
            with Locations((0, 0, -(M3X0_5_TAPPED_HOLE2_DEPTH + M3X0_5_TAPPED_HOLE2_TIP / 2))):  # 118° drill point
                Cone(0, M3X0_5_TAPPED_HOLE2_D / 2, M3X0_5_TAPPED_HOLE2_TIP, mode=Mode.SUBTRACT)

    # Fillet10
    fillet10_edges = [part.edges().sort_by_distance(p)[0] for p in [
        (223.99, 21.5, -60.5),
        (223.99, 21.5, 60.5),
    ]]
    fillet(fillet10_edges, radius=FILLET10_R)


solid = part.part
